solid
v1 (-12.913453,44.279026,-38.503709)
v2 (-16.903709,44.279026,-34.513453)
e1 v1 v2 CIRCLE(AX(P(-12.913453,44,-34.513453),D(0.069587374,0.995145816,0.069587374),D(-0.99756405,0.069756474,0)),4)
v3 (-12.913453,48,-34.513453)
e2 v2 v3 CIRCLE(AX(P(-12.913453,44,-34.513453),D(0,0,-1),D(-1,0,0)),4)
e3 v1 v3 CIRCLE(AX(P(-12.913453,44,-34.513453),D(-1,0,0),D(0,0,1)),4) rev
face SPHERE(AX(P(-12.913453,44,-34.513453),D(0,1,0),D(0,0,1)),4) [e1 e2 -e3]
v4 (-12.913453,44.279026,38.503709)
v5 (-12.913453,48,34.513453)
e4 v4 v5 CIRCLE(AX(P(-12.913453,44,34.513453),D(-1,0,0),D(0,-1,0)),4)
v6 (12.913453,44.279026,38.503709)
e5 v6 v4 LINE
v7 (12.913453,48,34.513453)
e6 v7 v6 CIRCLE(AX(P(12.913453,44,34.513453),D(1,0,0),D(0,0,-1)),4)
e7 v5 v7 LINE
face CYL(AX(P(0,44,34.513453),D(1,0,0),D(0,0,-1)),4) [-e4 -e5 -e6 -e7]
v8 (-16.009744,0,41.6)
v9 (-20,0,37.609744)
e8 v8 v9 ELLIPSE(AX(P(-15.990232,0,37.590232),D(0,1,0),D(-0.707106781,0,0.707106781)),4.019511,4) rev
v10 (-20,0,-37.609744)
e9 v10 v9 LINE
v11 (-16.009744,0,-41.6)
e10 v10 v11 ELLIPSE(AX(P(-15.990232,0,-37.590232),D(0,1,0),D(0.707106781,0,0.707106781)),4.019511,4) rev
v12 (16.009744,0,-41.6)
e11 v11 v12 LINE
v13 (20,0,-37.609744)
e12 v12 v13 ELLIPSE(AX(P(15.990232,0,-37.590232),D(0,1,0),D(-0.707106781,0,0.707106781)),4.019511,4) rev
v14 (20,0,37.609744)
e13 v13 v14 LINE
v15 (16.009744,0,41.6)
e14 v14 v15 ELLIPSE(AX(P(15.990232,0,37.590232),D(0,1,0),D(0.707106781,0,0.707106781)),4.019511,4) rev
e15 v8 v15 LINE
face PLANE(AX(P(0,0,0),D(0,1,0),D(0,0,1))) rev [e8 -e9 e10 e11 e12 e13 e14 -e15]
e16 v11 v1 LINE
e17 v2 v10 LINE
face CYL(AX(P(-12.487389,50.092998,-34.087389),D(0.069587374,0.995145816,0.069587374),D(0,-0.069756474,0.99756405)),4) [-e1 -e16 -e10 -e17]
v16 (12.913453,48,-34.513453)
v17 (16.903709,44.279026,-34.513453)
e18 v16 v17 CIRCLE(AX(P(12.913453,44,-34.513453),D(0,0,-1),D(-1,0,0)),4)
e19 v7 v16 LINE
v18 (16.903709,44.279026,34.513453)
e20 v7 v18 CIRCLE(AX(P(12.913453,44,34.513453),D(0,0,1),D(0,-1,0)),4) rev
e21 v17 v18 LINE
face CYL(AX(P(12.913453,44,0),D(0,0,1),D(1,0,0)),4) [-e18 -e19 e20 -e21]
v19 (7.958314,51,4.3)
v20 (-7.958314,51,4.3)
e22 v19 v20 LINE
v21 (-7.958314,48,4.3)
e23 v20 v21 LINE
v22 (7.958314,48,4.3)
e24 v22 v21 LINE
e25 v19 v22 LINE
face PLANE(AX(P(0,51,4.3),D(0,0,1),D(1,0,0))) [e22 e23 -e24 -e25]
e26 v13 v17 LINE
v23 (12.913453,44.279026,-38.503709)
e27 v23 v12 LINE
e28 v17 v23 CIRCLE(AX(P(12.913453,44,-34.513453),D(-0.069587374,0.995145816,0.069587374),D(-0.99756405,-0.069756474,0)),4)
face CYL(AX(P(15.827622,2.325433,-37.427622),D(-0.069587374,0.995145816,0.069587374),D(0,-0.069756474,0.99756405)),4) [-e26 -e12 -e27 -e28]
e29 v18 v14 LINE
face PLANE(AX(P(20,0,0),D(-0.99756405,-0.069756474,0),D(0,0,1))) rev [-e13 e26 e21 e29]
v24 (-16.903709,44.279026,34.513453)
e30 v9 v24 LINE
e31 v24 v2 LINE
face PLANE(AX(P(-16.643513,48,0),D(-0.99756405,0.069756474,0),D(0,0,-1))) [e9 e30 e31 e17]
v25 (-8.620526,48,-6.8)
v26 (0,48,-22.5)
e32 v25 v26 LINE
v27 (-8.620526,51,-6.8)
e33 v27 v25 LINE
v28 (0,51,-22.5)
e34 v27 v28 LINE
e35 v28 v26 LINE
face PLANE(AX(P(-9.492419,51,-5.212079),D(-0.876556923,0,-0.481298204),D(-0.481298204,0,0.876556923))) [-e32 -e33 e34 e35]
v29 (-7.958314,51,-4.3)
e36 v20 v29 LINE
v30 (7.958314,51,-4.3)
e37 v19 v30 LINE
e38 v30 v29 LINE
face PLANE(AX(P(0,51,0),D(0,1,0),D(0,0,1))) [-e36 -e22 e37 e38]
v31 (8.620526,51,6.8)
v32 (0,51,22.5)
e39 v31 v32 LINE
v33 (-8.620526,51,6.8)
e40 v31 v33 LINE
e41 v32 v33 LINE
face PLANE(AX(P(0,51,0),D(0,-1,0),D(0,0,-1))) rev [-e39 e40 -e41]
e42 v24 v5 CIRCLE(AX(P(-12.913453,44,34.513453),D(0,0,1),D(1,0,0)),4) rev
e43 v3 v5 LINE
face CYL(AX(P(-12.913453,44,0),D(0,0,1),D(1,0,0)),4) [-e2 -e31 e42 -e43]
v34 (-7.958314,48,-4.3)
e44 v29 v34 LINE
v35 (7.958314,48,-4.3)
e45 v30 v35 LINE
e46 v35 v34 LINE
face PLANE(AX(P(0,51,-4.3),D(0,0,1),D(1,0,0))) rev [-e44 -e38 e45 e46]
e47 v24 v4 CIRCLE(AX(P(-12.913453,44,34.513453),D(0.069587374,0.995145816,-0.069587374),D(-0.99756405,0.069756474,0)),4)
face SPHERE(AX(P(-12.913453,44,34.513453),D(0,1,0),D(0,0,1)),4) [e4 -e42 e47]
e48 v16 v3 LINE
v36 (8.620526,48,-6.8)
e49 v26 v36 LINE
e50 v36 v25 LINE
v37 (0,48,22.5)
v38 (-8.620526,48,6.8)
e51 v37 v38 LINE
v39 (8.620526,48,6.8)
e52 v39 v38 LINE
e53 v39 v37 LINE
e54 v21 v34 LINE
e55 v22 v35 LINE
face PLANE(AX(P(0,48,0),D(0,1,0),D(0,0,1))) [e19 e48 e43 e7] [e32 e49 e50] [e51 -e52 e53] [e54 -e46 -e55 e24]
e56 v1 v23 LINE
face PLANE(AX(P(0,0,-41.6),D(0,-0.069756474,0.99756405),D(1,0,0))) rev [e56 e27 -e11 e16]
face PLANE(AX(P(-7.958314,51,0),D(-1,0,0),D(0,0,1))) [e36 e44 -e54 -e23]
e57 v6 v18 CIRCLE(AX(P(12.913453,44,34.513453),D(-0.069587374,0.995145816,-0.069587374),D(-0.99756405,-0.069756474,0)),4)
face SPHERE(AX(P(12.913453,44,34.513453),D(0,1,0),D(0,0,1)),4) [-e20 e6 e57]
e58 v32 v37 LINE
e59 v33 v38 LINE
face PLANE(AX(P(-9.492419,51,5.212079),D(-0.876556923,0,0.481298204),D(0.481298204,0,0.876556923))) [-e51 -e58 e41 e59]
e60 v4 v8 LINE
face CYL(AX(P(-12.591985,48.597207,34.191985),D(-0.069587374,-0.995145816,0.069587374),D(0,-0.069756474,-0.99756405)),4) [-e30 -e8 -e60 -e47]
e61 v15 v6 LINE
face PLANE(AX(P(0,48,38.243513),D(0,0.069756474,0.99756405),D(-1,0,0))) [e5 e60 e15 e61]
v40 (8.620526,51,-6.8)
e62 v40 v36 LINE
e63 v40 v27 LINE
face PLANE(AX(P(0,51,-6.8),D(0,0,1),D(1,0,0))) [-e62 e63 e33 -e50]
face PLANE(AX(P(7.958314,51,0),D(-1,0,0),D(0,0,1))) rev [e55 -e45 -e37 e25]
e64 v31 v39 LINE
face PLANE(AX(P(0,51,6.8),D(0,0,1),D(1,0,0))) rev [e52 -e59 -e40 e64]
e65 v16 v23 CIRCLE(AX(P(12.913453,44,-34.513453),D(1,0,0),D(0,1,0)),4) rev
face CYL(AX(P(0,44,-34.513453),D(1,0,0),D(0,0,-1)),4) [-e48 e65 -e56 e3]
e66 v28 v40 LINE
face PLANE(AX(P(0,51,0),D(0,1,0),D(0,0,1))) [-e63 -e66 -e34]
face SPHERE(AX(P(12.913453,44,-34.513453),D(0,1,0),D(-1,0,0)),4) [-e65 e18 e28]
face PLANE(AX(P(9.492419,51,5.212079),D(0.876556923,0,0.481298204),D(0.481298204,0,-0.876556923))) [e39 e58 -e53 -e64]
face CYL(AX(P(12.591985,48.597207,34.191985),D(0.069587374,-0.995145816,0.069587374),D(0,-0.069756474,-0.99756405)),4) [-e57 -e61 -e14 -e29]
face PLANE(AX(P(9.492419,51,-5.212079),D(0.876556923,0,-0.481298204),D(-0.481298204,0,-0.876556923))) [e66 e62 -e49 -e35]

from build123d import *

# Parameters (mm, degrees)
SKETCH1_W           = 40
SKETCH1_H           = 83.2
SKETCH1_W_2         = 15.916627574
SKETCH1_H_2         = 8.6
BOSS_EXTRUDE1_DEPTH = 48
CHAMFER1_SIZE       = 48
CHAMFER1_SIZE_2     = 3.356486973
BOSS_EXTRUDE2_START = 48
SKETCH1_3_W         = 15.916627574
SKETCH1_3_H         = 8.6
BOSS_EXTRUDE2_DEPTH = 3
FILLET1_R           = 4


with BuildPart() as part:
    # Sketch1 → Boss-Extrude1 (new body)
    # profile 1 of 4: a face of its own
    with BuildSketch(Plane(origin=(0, 0, 0), x_dir=(1, 0, 0), z_dir=(0, 1, 0))):
        Rectangle(SKETCH1_W, SKETCH1_H)
        Polygon((8.620526076, 6.8), (0, 22.5), (-8.620526076, 6.8), align=None, mode=Mode.SUBTRACT)
        Rectangle(SKETCH1_W_2, SKETCH1_H_2, mode=Mode.SUBTRACT)
        Polygon((-8.620526076, -6.8), (0, -22.5), (8.620526076, -6.8), align=None, mode=Mode.SUBTRACT)
    # profile 2 of 4: a face of its own
    with BuildSketch(Plane(origin=(0, 0, 0), x_dir=(1, 0, 0), z_dir=(0, 1, 0))):
        Polygon((-8.620526076, 6.8), (8.620526076, 6.8), (0, 22.5), align=None)
    # profile 3 of 4: a face of its own
    with BuildSketch(Plane(origin=(0, 0, 0), x_dir=(1, 0, 0), z_dir=(0, 1, 0))):
        Rectangle(SKETCH1_W_2, SKETCH1_H_2)
    # profile 4 of 4: a face of its own
    with BuildSketch(Plane(origin=(0, 0, 0), x_dir=(1, 0, 0), z_dir=(0, 1, 0))):
        Polygon((-8.620526076, -6.8), (8.620526076, -6.8), (0, -22.5), align=None)
    extrude(amount=BOSS_EXTRUDE1_DEPTH)

    # Chamfer1
    # the kernel refuses this chamfer: 48, 3.356486973 mm, written as the material it takes off along each edge
    with BuildSketch(Plane(origin=(144.788756649, 48, 41.6), x_dir=(0, -0.999996400257939, 0.002683183028377395), z_dir=(-1, 0, 0)), Plane(origin=(-144.788756649, 48, -41.6), x_dir=(0, -0.999996400257939, -0.002683183028377395), z_dir=(1, 0, 0))) as chamfer1_piece_1:
        Polygon((CHAMFER1_SIZE * 0.999996400258, -CHAMFER1_SIZE * 0.00268318302838), (-CHAMFER1_SIZE_2 * 0.00268318302861, -CHAMFER1_SIZE_2 * 0.999996400344), (0, 0), align=None)
    extrude(amount=289.577513297, mode=Mode.SUBTRACT)
    with BuildSketch(Plane(origin=(-20, 48, 166.388756649), x_dir=(0.8766829747338886, 0.4810685624853697, 0), z_dir=(0, 0, -1))) as chamfer1_piece_2:
        Polygon((CHAMFER1_SIZE_2 * 0.876682974809, CHAMFER1_SIZE_2 * 0.481068562527), (-CHAMFER1_SIZE * 0.481068562485, CHAMFER1_SIZE * 0.876682974734), (0, 0), align=None)
    extrude(amount=332.777513297, mode=Mode.SUBTRACT)
    with BuildSketch(Plane(origin=(20, 48, -166.388756649), x_dir=(0.002683183028377466, -0.999996400257939, 0), z_dir=(0, 0, 1))) as chamfer1_piece_3:
        Polygon((CHAMFER1_SIZE * 0.999996400258, -CHAMFER1_SIZE * 0.00268318302838), (-CHAMFER1_SIZE_2 * 0.00268318302861, -CHAMFER1_SIZE_2 * 0.999996400344), (0, 0), align=None)
    extrude(amount=332.777513297, mode=Mode.SUBTRACT)

    # Sketch1<3> → Boss-Extrude2 (add)
    with BuildSketch(Plane(origin=(0, 0, 0), x_dir=(1, 0, 0), z_dir=(0, 1, 0)).offset(BOSS_EXTRUDE2_START)):
        Polygon((-8.620526076, 6.8), (8.620526076, 6.8), (0, 22.5), align=None)
        Rectangle(SKETCH1_3_W, SKETCH1_3_H)
        Polygon((-8.620526076, -6.8), (8.620526076, -6.8), (0, -22.5), align=None)
    extrude(amount=BOSS_EXTRUDE2_DEPTH)

    # Fillet1
    fillet1_edges = [part.edges().sort_by_distance(p)[0] for p in [
        (16.643513027, 48, 0),
        (0, 48, -38.243513027),
        (-16.643513027, 48, 0),
        (0, 48, 38.243513027),
        (-18.321756513, 24, -39.921756513),
        (18.321756513, 24, -39.921756513),
        (-18.321756513, 24, 39.921756513),
        (18.321756513, 24, 39.921756513),
    ]]
    fillet(fillet1_edges, radius=FILLET1_R)


solid = part.part
